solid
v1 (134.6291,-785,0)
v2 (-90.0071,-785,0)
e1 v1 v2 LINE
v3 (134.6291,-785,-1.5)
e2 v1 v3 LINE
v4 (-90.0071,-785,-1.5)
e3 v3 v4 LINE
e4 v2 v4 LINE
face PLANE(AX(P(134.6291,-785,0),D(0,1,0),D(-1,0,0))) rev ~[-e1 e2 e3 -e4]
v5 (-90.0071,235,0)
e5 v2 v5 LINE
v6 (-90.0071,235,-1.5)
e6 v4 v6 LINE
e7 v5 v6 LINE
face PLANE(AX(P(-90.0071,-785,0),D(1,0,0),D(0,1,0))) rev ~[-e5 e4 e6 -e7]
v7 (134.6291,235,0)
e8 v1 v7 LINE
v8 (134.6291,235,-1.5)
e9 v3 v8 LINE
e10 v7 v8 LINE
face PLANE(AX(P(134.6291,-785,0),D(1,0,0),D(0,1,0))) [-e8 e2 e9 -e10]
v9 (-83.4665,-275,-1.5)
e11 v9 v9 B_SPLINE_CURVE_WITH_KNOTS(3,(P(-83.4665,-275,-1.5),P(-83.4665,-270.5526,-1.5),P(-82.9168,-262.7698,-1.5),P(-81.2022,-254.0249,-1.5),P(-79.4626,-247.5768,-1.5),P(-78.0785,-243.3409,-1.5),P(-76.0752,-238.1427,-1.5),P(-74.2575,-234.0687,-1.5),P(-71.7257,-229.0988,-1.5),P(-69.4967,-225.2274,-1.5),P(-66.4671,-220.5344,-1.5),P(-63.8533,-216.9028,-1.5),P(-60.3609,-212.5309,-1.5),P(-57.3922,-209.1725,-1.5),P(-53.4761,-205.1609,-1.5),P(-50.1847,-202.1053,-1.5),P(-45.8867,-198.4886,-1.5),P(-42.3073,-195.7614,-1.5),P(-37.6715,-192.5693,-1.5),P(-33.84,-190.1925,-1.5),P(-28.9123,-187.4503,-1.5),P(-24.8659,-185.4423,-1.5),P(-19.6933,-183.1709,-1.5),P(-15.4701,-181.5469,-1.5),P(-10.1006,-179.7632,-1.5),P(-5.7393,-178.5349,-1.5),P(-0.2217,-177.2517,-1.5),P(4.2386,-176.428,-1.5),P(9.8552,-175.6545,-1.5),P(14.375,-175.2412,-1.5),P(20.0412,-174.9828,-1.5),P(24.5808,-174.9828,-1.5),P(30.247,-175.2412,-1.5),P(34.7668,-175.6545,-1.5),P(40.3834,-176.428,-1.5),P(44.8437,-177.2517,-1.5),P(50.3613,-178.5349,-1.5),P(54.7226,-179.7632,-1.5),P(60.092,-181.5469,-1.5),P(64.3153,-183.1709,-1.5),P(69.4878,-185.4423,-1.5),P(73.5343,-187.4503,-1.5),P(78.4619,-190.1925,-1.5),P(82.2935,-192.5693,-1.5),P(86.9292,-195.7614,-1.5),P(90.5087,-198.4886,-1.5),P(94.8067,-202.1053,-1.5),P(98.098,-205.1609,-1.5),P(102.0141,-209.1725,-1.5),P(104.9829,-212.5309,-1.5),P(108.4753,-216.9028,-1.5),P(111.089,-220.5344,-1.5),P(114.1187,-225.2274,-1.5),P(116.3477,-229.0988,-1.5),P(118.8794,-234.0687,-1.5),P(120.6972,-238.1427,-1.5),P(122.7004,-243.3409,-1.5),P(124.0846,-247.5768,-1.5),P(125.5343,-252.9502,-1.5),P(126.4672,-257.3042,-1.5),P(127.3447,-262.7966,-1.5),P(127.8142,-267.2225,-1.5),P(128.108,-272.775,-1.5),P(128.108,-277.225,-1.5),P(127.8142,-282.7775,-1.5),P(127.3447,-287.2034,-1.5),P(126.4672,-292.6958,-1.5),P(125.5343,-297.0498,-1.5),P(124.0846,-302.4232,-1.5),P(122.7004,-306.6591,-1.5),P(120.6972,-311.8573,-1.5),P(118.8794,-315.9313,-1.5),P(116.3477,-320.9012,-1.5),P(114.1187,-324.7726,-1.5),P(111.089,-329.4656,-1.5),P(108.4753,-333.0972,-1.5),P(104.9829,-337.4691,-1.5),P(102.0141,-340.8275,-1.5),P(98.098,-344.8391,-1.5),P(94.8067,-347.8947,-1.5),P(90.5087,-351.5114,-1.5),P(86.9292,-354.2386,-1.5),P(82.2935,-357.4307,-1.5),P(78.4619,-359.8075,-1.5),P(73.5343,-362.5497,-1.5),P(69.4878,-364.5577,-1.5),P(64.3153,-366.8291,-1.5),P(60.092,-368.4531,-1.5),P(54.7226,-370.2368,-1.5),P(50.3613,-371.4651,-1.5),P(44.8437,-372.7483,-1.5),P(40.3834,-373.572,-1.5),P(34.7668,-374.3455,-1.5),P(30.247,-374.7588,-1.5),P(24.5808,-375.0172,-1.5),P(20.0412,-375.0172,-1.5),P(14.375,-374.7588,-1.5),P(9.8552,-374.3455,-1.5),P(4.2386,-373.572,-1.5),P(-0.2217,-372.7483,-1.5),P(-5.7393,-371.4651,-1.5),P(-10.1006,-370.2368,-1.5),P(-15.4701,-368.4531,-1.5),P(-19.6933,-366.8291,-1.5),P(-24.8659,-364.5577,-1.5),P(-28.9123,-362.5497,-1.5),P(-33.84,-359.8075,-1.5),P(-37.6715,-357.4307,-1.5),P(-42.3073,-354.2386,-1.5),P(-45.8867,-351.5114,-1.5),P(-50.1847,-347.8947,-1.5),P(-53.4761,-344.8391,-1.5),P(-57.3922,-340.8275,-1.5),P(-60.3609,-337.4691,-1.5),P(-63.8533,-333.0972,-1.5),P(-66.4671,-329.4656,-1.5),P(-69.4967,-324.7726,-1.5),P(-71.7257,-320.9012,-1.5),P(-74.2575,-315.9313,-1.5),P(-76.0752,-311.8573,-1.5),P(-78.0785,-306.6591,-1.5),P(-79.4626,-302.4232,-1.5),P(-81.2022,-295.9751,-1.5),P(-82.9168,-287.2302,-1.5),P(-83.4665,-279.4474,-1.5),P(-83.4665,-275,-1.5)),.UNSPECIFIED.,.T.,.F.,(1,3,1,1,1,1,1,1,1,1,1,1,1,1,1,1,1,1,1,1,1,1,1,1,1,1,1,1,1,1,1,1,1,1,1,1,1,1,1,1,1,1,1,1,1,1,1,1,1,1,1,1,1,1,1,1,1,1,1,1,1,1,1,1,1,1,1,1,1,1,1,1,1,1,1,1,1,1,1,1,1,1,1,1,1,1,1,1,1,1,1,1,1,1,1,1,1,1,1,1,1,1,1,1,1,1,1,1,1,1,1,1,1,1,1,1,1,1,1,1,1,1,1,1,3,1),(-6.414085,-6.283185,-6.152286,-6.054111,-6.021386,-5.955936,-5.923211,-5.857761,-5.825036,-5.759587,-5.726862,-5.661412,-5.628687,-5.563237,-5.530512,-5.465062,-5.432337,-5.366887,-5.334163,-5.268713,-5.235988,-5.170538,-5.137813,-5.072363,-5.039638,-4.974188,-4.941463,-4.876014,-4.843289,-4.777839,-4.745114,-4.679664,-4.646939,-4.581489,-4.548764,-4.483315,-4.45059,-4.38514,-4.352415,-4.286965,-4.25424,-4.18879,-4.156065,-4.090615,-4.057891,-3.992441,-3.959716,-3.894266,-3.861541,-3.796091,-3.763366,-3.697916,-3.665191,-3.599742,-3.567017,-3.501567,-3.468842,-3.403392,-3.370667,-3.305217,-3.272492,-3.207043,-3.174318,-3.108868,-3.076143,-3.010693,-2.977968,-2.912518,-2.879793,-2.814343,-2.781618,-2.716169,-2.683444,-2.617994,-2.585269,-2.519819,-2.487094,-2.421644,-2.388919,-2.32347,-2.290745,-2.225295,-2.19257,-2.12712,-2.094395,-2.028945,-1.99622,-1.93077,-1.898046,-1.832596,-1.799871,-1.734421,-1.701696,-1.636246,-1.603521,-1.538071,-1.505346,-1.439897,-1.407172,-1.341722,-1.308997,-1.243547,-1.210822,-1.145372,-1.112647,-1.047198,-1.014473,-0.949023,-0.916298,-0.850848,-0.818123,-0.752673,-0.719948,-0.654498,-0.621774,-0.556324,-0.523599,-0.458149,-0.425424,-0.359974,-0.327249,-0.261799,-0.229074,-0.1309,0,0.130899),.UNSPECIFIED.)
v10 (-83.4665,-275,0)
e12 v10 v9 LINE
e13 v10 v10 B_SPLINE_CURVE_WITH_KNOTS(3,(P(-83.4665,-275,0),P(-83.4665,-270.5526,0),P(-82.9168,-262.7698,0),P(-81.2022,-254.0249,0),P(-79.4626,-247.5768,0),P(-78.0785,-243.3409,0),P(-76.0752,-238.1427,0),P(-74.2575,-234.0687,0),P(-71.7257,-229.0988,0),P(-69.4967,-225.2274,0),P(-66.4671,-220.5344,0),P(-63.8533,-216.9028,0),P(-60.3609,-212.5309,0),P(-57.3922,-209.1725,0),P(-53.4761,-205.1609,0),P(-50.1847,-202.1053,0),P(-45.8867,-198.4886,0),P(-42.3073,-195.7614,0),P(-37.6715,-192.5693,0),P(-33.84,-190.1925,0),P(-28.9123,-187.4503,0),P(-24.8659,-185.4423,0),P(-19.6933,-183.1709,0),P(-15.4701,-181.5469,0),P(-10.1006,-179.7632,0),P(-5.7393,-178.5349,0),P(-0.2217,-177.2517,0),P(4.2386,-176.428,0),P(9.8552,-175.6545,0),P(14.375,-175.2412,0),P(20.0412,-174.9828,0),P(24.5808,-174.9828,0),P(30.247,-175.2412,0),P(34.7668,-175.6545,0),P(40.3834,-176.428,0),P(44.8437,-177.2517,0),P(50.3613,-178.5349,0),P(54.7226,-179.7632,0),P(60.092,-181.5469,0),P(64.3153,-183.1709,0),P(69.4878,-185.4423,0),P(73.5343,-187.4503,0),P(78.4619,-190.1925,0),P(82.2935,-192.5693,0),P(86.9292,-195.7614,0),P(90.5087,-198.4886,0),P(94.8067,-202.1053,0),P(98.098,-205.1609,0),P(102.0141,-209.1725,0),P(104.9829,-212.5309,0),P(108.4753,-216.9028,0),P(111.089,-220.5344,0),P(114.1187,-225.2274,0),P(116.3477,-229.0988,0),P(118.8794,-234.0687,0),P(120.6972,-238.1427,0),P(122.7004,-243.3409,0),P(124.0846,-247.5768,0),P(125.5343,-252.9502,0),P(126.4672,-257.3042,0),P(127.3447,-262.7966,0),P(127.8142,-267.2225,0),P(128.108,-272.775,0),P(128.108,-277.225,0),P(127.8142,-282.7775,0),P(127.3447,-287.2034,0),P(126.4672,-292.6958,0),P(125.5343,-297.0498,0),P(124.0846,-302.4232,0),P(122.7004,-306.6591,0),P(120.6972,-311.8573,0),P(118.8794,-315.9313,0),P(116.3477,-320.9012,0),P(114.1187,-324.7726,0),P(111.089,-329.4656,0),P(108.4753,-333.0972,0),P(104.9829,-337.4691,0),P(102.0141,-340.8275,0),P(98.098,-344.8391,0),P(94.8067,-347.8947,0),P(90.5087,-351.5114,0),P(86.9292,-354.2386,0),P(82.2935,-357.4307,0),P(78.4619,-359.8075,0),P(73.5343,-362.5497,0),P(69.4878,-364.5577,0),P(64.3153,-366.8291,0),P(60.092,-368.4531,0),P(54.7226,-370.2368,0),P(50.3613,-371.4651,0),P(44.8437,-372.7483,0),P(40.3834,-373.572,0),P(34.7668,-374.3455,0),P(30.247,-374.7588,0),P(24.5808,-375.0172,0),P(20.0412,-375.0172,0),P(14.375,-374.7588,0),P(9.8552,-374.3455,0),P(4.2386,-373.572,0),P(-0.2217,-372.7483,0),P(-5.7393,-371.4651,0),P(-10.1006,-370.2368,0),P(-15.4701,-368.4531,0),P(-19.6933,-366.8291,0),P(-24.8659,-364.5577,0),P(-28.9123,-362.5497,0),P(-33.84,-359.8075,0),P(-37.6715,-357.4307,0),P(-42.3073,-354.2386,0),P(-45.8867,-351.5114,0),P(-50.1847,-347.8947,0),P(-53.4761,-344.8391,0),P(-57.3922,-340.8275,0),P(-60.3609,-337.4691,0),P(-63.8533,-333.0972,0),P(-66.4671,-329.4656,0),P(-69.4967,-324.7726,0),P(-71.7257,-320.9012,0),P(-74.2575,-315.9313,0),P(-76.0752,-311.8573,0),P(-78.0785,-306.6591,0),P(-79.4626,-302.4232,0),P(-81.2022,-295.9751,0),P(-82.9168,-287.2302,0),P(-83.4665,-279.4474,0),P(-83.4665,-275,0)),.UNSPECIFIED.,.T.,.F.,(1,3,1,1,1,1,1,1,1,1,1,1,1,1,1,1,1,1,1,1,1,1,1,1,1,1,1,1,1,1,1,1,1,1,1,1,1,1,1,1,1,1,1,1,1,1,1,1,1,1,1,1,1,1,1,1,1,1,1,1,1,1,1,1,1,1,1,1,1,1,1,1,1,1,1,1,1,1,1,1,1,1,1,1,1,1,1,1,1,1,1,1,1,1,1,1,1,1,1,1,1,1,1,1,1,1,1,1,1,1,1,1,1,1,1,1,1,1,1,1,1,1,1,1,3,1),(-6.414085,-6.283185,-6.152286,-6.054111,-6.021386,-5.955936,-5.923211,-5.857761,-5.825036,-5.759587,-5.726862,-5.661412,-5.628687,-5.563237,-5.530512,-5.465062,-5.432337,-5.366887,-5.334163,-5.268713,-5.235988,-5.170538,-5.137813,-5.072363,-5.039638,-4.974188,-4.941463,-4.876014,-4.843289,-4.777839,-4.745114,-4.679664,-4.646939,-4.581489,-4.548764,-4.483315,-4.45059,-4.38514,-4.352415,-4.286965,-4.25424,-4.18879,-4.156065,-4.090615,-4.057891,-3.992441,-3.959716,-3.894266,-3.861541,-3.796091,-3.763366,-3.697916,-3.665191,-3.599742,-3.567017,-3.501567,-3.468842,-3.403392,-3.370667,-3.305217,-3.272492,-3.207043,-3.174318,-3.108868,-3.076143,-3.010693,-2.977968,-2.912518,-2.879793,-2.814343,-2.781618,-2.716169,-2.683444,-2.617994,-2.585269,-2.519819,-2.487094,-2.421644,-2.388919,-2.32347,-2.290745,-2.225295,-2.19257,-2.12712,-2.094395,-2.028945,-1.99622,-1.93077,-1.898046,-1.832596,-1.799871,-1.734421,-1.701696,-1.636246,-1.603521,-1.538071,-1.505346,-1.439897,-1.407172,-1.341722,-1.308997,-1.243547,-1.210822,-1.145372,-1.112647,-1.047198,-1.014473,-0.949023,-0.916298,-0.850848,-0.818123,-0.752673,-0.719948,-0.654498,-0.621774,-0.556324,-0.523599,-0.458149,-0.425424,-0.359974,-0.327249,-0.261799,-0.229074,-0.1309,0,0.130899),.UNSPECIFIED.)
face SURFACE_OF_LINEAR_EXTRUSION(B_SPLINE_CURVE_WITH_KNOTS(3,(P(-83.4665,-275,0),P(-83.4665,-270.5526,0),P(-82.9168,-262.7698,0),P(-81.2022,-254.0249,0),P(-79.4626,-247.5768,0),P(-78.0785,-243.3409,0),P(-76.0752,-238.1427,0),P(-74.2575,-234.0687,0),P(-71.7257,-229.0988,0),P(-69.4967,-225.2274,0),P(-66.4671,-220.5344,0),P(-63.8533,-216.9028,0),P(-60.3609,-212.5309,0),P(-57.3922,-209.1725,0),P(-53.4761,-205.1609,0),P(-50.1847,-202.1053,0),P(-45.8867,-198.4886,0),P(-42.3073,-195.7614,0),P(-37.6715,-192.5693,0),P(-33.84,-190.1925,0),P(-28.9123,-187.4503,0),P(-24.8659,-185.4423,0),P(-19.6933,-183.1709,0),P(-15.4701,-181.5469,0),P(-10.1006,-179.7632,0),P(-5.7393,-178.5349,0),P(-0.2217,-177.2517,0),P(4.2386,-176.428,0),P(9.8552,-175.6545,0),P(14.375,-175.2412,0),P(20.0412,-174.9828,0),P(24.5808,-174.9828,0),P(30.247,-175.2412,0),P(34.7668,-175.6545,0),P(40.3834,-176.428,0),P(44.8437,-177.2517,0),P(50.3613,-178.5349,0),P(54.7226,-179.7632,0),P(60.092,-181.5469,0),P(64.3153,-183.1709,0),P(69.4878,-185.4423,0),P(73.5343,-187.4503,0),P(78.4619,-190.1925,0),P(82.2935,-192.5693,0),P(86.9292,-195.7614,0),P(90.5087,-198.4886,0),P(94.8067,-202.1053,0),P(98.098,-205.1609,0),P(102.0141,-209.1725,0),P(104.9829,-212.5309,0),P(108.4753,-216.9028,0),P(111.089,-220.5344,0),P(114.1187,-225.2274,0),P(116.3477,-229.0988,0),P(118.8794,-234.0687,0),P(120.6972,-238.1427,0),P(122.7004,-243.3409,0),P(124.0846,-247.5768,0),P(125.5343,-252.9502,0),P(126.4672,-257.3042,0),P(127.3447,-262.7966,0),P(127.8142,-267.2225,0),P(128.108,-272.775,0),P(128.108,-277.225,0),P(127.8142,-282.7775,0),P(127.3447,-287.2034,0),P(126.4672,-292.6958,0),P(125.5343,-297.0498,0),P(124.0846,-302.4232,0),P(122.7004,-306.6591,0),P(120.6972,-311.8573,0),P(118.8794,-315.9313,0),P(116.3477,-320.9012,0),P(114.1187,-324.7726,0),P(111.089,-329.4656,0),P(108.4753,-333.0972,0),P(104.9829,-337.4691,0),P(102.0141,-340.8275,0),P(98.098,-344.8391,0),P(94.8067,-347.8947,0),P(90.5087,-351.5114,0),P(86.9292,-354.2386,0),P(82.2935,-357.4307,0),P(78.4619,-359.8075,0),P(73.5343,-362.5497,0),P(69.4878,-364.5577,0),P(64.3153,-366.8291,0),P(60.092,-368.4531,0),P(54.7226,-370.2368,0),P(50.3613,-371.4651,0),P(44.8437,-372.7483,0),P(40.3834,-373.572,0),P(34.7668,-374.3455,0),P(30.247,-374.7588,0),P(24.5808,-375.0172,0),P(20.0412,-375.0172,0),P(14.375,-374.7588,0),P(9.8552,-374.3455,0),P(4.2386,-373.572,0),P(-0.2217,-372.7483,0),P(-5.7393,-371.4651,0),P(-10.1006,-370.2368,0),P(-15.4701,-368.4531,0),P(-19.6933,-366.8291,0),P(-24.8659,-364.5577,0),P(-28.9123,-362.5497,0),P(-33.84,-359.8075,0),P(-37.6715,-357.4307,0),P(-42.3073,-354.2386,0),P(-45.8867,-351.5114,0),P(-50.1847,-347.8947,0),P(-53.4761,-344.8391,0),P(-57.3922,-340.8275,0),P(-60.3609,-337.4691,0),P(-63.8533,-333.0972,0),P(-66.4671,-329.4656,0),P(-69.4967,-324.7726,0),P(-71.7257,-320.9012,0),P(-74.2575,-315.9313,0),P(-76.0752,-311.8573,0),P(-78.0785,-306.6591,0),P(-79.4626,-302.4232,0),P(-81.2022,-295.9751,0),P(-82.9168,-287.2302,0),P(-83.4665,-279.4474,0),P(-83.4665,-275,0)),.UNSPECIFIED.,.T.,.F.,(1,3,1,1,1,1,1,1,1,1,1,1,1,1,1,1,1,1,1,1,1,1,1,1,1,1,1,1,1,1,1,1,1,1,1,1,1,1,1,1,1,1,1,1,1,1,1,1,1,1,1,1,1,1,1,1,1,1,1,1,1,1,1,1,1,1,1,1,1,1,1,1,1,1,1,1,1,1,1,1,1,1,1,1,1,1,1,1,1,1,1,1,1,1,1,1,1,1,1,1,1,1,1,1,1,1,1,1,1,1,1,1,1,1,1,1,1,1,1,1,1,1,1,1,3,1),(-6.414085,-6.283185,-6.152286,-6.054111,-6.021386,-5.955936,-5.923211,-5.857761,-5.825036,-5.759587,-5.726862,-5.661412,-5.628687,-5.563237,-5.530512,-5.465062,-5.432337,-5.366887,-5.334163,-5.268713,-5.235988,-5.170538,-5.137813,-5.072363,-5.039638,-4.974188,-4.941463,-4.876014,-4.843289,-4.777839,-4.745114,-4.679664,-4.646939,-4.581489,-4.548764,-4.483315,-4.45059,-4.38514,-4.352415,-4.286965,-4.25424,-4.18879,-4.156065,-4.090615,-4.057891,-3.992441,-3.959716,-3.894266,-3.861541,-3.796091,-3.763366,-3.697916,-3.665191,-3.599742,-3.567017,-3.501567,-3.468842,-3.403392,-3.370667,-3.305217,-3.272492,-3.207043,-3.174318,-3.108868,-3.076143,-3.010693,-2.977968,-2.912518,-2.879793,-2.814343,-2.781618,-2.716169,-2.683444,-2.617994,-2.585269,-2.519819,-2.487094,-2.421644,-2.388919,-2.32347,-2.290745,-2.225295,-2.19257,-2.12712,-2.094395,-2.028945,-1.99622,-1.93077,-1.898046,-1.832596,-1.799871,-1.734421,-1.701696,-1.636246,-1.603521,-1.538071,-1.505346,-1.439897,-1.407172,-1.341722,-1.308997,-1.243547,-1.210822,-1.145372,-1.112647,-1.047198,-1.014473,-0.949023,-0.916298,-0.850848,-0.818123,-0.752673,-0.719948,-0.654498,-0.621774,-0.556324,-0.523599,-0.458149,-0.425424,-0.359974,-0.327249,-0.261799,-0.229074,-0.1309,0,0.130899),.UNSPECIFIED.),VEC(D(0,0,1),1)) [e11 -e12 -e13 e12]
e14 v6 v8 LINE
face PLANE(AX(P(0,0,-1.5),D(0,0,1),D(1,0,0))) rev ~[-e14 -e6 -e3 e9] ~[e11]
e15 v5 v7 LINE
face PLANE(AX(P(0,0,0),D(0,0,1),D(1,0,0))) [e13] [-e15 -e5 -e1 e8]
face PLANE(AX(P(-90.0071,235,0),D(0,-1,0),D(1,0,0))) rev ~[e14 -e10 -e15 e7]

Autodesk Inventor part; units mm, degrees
ref_plane "YZ Plane" through (0, 0, 0) normal (1, 0, 0) x (0, 1, 0)
ref_plane "XZ Plane" through (0, 0, 0) normal (0, 1, 0) x (-1, 0, 0)
ref_plane "Work Plane1" through (0, 0, 0) normal (0, 0, 1) x (1, 0, 0)
sketch "Sketch1" plane through (0, 0, 0) normal (0, 0, 1) x (1, 0, 0)
  line L0 (-90.0071, -785) -> (-90.0071, 235)
  line L1 (134.6291, -785) -> (-90.0071, -785)
  line L2 (134.6291, -785) -> (134.6291, 235)
  line L3 (-90.0071, 235) -> (134.6291, 235)
  spline S0 degree 3 poles (-83.4665, -275) (-83.4665, -270.5526) (-82.9168, -262.7698) (-81.2022, -254.0249) (-79.4626, -247.5768) (-78.0785, -243.3409) (-76.0752, -238.1427) (-74.2575, -234.0687) (-71.7257, -229.0988) (-69.4967, -225.2274) (-66.4671, -220.5344) (-63.8533, -216.9028) (-60.3609, -212.5309) (-57.3922, -209.1725) (-53.4761, -205.1609) (-50.1847, -202.1053) (-45.8867, -198.4886) (-42.3073, -195.7614) (-37.6715, -192.5693) (-33.84, -190.1925) (-28.9123, -187.4503) (-24.8659, -185.4423) (-19.6933, -183.1709) (-15.4701, -181.5469) (-10.1006, -179.7632) (-5.7393, -178.5349) (-0.2217, -177.2517) (4.2386, -176.428) (9.8552, -175.6545) (14.375, -175.2412) (20.0412, -174.9828) (24.5808, -174.9828) (30.247, -175.2412) (34.7668, -175.6545) (40.3834, -176.428) (44.8437, -177.2517) (50.3613, -178.5349) (54.7226, -179.7632) (60.092, -181.5469) (64.3153, -183.1709) (69.4878, -185.4423) (73.5343, -187.4503) (78.4619, -190.1925) (82.2935, -192.5693) (86.9292, -195.7614) (90.5087, -198.4886) (94.8067, -202.1053) (98.098, -205.1609) (102.0141, -209.1725) (104.9829, -212.5309) (108.4753, -216.9028) (111.089, -220.5344) (114.1187, -225.2274) (116.3477, -229.0988) (118.8794, -234.0687) (120.6972, -238.1427) (122.7004, -243.3409) (124.0846, -247.5768) (125.5343, -252.9502) (126.4672, -257.3042) (127.3447, -262.7966) (127.8142, -267.2225) (128.108, -272.775) (128.108, -277.225) (127.8142, -282.7775) (127.3447, -287.2034) (126.4672, -292.6958) (125.5343, -297.0498) (124.0846, -302.4232) (122.7004, -306.6591) (120.6972, -311.8573) (118.8794, -315.9313) (116.3477, -320.9012) (114.1187, -324.7726) (111.089, -329.4656) (108.4753, -333.0972) (104.9829, -337.4691) (102.0141, -340.8275) (98.098, -344.8391) (94.8067, -347.8947) (90.5087, -351.5114) (86.9292, -354.2386) (82.2935, -357.4307) (78.4619, -359.8075) (73.5343, -362.5497) (69.4878, -364.5577) (64.3153, -366.8291) (60.092, -368.4531) (54.7226, -370.2368) (50.3613, -371.4651) (44.8437, -372.7483) (40.3834, -373.572) (34.7668, -374.3455) (30.247, -374.7588) (24.5808, -375.0172) (20.0412, -375.0172) (14.375, -374.7588) (9.8552, -374.3455) (4.2386, -373.572) (-0.2217, -372.7483) (-5.7393, -371.4651) (-10.1006, -370.2368) (-15.4701, -368.4531) (-19.6933, -366.8291) (-24.8659, -364.5577) (-28.9123, -362.5497) (-33.84, -359.8075) (-37.6715, -357.4307) (-42.3073, -354.2386) (-45.8867, -351.5114) (-50.1847, -347.8947) (-53.4761, -344.8391) (-57.3922, -340.8275) (-60.3609, -337.4691) (-63.8533, -333.0972) (-66.4671, -329.4656) (-69.4967, -324.7726) (-71.7257, -320.9012) (-74.2575, -315.9313) (-76.0752, -311.8573) (-78.0785, -306.6591) (-79.4626, -302.4232) (-81.2022, -295.9751) (-82.9168, -287.2302) (-83.4665, -279.4474) (-83.4665, -275) knots -6.283185 -6.283185 -6.283185 -6.283185 -6.152286 -6.054111 -6.021386 -5.955936 -5.923211 -5.857761 -5.825036 -5.759587 -5.726862 -5.661412 -5.628687 -5.563237 -5.530512 -5.465062 -5.432337 -5.366887 -5.334163 -5.268713 -5.235988 -5.170538 -5.137813 -5.072363 -5.039638 -4.974188 -4.941463 -4.876014 -4.843289 -4.777839 -4.745114 -4.679664 -4.646939 -4.581489 -4.548764 -4.483315 -4.45059 -4.38514 -4.352415 -4.286965 -4.25424 -4.18879 -4.156065 -4.090615 -4.057891 -3.992441 -3.959716 -3.894266 -3.861541 -3.796091 -3.763366 -3.697916 -3.665191 -3.599742 -3.567017 -3.501567 -3.468842 -3.403392 -3.370667 -3.305217 -3.272492 -3.207043 -3.174318 -3.108868 -3.076143 -3.010693 -2.977968 -2.912518 -2.879793 -2.814343 -2.781618 -2.716169 -2.683444 -2.617994 -2.585269 -2.519819 -2.487094 -2.421644 -2.388919 -2.32347 -2.290745 -2.225295 -2.19257 -2.12712 -2.094395 -2.028945 -1.99622 -1.93077 -1.898046 -1.832596 -1.799871 -1.734421 -1.701696 -1.636246 -1.603521 -1.538071 -1.505346 -1.439897 -1.407172 -1.341722 -1.308997 -1.243547 -1.210822 -1.145372 -1.112647 -1.047198 -1.014473 -0.949023 -0.916298 -0.850848 -0.818123 -0.752673 -0.719948 -0.654498 -0.621774 -0.556324 -0.523599 -0.458149 -0.425424 -0.359974 -0.327249 -0.261799 -0.229074 -0.1309 0 0 0 0
  point P0 (0, 0)
  point P1 (-83.4665, -275)
extrude "Plate1" add sketch "Sketch1" against normal blind 1.5
equation "\"d0\" = Thickness"
equation "\"BendRadius\" = Thickness"
equation "\"BendReliefWidth\" = Thickness"
equation "\"BendReliefDepth\" = 0.5 * Thickness"
equation "\"CornerReliefSize\" = 4 * Thickness"
equation "\"MinimumRemnant\" = 2 * Thickness"
equation "\"TransitionRadius\" = BendRadius"
equation "\"JacobiRadiusSize\" = BendRadius"
equation "\"GapSize\" = Thickness"
equation "\"Thickness\" = 1.5"
properties part number "CARCASA_ALUM_2"
